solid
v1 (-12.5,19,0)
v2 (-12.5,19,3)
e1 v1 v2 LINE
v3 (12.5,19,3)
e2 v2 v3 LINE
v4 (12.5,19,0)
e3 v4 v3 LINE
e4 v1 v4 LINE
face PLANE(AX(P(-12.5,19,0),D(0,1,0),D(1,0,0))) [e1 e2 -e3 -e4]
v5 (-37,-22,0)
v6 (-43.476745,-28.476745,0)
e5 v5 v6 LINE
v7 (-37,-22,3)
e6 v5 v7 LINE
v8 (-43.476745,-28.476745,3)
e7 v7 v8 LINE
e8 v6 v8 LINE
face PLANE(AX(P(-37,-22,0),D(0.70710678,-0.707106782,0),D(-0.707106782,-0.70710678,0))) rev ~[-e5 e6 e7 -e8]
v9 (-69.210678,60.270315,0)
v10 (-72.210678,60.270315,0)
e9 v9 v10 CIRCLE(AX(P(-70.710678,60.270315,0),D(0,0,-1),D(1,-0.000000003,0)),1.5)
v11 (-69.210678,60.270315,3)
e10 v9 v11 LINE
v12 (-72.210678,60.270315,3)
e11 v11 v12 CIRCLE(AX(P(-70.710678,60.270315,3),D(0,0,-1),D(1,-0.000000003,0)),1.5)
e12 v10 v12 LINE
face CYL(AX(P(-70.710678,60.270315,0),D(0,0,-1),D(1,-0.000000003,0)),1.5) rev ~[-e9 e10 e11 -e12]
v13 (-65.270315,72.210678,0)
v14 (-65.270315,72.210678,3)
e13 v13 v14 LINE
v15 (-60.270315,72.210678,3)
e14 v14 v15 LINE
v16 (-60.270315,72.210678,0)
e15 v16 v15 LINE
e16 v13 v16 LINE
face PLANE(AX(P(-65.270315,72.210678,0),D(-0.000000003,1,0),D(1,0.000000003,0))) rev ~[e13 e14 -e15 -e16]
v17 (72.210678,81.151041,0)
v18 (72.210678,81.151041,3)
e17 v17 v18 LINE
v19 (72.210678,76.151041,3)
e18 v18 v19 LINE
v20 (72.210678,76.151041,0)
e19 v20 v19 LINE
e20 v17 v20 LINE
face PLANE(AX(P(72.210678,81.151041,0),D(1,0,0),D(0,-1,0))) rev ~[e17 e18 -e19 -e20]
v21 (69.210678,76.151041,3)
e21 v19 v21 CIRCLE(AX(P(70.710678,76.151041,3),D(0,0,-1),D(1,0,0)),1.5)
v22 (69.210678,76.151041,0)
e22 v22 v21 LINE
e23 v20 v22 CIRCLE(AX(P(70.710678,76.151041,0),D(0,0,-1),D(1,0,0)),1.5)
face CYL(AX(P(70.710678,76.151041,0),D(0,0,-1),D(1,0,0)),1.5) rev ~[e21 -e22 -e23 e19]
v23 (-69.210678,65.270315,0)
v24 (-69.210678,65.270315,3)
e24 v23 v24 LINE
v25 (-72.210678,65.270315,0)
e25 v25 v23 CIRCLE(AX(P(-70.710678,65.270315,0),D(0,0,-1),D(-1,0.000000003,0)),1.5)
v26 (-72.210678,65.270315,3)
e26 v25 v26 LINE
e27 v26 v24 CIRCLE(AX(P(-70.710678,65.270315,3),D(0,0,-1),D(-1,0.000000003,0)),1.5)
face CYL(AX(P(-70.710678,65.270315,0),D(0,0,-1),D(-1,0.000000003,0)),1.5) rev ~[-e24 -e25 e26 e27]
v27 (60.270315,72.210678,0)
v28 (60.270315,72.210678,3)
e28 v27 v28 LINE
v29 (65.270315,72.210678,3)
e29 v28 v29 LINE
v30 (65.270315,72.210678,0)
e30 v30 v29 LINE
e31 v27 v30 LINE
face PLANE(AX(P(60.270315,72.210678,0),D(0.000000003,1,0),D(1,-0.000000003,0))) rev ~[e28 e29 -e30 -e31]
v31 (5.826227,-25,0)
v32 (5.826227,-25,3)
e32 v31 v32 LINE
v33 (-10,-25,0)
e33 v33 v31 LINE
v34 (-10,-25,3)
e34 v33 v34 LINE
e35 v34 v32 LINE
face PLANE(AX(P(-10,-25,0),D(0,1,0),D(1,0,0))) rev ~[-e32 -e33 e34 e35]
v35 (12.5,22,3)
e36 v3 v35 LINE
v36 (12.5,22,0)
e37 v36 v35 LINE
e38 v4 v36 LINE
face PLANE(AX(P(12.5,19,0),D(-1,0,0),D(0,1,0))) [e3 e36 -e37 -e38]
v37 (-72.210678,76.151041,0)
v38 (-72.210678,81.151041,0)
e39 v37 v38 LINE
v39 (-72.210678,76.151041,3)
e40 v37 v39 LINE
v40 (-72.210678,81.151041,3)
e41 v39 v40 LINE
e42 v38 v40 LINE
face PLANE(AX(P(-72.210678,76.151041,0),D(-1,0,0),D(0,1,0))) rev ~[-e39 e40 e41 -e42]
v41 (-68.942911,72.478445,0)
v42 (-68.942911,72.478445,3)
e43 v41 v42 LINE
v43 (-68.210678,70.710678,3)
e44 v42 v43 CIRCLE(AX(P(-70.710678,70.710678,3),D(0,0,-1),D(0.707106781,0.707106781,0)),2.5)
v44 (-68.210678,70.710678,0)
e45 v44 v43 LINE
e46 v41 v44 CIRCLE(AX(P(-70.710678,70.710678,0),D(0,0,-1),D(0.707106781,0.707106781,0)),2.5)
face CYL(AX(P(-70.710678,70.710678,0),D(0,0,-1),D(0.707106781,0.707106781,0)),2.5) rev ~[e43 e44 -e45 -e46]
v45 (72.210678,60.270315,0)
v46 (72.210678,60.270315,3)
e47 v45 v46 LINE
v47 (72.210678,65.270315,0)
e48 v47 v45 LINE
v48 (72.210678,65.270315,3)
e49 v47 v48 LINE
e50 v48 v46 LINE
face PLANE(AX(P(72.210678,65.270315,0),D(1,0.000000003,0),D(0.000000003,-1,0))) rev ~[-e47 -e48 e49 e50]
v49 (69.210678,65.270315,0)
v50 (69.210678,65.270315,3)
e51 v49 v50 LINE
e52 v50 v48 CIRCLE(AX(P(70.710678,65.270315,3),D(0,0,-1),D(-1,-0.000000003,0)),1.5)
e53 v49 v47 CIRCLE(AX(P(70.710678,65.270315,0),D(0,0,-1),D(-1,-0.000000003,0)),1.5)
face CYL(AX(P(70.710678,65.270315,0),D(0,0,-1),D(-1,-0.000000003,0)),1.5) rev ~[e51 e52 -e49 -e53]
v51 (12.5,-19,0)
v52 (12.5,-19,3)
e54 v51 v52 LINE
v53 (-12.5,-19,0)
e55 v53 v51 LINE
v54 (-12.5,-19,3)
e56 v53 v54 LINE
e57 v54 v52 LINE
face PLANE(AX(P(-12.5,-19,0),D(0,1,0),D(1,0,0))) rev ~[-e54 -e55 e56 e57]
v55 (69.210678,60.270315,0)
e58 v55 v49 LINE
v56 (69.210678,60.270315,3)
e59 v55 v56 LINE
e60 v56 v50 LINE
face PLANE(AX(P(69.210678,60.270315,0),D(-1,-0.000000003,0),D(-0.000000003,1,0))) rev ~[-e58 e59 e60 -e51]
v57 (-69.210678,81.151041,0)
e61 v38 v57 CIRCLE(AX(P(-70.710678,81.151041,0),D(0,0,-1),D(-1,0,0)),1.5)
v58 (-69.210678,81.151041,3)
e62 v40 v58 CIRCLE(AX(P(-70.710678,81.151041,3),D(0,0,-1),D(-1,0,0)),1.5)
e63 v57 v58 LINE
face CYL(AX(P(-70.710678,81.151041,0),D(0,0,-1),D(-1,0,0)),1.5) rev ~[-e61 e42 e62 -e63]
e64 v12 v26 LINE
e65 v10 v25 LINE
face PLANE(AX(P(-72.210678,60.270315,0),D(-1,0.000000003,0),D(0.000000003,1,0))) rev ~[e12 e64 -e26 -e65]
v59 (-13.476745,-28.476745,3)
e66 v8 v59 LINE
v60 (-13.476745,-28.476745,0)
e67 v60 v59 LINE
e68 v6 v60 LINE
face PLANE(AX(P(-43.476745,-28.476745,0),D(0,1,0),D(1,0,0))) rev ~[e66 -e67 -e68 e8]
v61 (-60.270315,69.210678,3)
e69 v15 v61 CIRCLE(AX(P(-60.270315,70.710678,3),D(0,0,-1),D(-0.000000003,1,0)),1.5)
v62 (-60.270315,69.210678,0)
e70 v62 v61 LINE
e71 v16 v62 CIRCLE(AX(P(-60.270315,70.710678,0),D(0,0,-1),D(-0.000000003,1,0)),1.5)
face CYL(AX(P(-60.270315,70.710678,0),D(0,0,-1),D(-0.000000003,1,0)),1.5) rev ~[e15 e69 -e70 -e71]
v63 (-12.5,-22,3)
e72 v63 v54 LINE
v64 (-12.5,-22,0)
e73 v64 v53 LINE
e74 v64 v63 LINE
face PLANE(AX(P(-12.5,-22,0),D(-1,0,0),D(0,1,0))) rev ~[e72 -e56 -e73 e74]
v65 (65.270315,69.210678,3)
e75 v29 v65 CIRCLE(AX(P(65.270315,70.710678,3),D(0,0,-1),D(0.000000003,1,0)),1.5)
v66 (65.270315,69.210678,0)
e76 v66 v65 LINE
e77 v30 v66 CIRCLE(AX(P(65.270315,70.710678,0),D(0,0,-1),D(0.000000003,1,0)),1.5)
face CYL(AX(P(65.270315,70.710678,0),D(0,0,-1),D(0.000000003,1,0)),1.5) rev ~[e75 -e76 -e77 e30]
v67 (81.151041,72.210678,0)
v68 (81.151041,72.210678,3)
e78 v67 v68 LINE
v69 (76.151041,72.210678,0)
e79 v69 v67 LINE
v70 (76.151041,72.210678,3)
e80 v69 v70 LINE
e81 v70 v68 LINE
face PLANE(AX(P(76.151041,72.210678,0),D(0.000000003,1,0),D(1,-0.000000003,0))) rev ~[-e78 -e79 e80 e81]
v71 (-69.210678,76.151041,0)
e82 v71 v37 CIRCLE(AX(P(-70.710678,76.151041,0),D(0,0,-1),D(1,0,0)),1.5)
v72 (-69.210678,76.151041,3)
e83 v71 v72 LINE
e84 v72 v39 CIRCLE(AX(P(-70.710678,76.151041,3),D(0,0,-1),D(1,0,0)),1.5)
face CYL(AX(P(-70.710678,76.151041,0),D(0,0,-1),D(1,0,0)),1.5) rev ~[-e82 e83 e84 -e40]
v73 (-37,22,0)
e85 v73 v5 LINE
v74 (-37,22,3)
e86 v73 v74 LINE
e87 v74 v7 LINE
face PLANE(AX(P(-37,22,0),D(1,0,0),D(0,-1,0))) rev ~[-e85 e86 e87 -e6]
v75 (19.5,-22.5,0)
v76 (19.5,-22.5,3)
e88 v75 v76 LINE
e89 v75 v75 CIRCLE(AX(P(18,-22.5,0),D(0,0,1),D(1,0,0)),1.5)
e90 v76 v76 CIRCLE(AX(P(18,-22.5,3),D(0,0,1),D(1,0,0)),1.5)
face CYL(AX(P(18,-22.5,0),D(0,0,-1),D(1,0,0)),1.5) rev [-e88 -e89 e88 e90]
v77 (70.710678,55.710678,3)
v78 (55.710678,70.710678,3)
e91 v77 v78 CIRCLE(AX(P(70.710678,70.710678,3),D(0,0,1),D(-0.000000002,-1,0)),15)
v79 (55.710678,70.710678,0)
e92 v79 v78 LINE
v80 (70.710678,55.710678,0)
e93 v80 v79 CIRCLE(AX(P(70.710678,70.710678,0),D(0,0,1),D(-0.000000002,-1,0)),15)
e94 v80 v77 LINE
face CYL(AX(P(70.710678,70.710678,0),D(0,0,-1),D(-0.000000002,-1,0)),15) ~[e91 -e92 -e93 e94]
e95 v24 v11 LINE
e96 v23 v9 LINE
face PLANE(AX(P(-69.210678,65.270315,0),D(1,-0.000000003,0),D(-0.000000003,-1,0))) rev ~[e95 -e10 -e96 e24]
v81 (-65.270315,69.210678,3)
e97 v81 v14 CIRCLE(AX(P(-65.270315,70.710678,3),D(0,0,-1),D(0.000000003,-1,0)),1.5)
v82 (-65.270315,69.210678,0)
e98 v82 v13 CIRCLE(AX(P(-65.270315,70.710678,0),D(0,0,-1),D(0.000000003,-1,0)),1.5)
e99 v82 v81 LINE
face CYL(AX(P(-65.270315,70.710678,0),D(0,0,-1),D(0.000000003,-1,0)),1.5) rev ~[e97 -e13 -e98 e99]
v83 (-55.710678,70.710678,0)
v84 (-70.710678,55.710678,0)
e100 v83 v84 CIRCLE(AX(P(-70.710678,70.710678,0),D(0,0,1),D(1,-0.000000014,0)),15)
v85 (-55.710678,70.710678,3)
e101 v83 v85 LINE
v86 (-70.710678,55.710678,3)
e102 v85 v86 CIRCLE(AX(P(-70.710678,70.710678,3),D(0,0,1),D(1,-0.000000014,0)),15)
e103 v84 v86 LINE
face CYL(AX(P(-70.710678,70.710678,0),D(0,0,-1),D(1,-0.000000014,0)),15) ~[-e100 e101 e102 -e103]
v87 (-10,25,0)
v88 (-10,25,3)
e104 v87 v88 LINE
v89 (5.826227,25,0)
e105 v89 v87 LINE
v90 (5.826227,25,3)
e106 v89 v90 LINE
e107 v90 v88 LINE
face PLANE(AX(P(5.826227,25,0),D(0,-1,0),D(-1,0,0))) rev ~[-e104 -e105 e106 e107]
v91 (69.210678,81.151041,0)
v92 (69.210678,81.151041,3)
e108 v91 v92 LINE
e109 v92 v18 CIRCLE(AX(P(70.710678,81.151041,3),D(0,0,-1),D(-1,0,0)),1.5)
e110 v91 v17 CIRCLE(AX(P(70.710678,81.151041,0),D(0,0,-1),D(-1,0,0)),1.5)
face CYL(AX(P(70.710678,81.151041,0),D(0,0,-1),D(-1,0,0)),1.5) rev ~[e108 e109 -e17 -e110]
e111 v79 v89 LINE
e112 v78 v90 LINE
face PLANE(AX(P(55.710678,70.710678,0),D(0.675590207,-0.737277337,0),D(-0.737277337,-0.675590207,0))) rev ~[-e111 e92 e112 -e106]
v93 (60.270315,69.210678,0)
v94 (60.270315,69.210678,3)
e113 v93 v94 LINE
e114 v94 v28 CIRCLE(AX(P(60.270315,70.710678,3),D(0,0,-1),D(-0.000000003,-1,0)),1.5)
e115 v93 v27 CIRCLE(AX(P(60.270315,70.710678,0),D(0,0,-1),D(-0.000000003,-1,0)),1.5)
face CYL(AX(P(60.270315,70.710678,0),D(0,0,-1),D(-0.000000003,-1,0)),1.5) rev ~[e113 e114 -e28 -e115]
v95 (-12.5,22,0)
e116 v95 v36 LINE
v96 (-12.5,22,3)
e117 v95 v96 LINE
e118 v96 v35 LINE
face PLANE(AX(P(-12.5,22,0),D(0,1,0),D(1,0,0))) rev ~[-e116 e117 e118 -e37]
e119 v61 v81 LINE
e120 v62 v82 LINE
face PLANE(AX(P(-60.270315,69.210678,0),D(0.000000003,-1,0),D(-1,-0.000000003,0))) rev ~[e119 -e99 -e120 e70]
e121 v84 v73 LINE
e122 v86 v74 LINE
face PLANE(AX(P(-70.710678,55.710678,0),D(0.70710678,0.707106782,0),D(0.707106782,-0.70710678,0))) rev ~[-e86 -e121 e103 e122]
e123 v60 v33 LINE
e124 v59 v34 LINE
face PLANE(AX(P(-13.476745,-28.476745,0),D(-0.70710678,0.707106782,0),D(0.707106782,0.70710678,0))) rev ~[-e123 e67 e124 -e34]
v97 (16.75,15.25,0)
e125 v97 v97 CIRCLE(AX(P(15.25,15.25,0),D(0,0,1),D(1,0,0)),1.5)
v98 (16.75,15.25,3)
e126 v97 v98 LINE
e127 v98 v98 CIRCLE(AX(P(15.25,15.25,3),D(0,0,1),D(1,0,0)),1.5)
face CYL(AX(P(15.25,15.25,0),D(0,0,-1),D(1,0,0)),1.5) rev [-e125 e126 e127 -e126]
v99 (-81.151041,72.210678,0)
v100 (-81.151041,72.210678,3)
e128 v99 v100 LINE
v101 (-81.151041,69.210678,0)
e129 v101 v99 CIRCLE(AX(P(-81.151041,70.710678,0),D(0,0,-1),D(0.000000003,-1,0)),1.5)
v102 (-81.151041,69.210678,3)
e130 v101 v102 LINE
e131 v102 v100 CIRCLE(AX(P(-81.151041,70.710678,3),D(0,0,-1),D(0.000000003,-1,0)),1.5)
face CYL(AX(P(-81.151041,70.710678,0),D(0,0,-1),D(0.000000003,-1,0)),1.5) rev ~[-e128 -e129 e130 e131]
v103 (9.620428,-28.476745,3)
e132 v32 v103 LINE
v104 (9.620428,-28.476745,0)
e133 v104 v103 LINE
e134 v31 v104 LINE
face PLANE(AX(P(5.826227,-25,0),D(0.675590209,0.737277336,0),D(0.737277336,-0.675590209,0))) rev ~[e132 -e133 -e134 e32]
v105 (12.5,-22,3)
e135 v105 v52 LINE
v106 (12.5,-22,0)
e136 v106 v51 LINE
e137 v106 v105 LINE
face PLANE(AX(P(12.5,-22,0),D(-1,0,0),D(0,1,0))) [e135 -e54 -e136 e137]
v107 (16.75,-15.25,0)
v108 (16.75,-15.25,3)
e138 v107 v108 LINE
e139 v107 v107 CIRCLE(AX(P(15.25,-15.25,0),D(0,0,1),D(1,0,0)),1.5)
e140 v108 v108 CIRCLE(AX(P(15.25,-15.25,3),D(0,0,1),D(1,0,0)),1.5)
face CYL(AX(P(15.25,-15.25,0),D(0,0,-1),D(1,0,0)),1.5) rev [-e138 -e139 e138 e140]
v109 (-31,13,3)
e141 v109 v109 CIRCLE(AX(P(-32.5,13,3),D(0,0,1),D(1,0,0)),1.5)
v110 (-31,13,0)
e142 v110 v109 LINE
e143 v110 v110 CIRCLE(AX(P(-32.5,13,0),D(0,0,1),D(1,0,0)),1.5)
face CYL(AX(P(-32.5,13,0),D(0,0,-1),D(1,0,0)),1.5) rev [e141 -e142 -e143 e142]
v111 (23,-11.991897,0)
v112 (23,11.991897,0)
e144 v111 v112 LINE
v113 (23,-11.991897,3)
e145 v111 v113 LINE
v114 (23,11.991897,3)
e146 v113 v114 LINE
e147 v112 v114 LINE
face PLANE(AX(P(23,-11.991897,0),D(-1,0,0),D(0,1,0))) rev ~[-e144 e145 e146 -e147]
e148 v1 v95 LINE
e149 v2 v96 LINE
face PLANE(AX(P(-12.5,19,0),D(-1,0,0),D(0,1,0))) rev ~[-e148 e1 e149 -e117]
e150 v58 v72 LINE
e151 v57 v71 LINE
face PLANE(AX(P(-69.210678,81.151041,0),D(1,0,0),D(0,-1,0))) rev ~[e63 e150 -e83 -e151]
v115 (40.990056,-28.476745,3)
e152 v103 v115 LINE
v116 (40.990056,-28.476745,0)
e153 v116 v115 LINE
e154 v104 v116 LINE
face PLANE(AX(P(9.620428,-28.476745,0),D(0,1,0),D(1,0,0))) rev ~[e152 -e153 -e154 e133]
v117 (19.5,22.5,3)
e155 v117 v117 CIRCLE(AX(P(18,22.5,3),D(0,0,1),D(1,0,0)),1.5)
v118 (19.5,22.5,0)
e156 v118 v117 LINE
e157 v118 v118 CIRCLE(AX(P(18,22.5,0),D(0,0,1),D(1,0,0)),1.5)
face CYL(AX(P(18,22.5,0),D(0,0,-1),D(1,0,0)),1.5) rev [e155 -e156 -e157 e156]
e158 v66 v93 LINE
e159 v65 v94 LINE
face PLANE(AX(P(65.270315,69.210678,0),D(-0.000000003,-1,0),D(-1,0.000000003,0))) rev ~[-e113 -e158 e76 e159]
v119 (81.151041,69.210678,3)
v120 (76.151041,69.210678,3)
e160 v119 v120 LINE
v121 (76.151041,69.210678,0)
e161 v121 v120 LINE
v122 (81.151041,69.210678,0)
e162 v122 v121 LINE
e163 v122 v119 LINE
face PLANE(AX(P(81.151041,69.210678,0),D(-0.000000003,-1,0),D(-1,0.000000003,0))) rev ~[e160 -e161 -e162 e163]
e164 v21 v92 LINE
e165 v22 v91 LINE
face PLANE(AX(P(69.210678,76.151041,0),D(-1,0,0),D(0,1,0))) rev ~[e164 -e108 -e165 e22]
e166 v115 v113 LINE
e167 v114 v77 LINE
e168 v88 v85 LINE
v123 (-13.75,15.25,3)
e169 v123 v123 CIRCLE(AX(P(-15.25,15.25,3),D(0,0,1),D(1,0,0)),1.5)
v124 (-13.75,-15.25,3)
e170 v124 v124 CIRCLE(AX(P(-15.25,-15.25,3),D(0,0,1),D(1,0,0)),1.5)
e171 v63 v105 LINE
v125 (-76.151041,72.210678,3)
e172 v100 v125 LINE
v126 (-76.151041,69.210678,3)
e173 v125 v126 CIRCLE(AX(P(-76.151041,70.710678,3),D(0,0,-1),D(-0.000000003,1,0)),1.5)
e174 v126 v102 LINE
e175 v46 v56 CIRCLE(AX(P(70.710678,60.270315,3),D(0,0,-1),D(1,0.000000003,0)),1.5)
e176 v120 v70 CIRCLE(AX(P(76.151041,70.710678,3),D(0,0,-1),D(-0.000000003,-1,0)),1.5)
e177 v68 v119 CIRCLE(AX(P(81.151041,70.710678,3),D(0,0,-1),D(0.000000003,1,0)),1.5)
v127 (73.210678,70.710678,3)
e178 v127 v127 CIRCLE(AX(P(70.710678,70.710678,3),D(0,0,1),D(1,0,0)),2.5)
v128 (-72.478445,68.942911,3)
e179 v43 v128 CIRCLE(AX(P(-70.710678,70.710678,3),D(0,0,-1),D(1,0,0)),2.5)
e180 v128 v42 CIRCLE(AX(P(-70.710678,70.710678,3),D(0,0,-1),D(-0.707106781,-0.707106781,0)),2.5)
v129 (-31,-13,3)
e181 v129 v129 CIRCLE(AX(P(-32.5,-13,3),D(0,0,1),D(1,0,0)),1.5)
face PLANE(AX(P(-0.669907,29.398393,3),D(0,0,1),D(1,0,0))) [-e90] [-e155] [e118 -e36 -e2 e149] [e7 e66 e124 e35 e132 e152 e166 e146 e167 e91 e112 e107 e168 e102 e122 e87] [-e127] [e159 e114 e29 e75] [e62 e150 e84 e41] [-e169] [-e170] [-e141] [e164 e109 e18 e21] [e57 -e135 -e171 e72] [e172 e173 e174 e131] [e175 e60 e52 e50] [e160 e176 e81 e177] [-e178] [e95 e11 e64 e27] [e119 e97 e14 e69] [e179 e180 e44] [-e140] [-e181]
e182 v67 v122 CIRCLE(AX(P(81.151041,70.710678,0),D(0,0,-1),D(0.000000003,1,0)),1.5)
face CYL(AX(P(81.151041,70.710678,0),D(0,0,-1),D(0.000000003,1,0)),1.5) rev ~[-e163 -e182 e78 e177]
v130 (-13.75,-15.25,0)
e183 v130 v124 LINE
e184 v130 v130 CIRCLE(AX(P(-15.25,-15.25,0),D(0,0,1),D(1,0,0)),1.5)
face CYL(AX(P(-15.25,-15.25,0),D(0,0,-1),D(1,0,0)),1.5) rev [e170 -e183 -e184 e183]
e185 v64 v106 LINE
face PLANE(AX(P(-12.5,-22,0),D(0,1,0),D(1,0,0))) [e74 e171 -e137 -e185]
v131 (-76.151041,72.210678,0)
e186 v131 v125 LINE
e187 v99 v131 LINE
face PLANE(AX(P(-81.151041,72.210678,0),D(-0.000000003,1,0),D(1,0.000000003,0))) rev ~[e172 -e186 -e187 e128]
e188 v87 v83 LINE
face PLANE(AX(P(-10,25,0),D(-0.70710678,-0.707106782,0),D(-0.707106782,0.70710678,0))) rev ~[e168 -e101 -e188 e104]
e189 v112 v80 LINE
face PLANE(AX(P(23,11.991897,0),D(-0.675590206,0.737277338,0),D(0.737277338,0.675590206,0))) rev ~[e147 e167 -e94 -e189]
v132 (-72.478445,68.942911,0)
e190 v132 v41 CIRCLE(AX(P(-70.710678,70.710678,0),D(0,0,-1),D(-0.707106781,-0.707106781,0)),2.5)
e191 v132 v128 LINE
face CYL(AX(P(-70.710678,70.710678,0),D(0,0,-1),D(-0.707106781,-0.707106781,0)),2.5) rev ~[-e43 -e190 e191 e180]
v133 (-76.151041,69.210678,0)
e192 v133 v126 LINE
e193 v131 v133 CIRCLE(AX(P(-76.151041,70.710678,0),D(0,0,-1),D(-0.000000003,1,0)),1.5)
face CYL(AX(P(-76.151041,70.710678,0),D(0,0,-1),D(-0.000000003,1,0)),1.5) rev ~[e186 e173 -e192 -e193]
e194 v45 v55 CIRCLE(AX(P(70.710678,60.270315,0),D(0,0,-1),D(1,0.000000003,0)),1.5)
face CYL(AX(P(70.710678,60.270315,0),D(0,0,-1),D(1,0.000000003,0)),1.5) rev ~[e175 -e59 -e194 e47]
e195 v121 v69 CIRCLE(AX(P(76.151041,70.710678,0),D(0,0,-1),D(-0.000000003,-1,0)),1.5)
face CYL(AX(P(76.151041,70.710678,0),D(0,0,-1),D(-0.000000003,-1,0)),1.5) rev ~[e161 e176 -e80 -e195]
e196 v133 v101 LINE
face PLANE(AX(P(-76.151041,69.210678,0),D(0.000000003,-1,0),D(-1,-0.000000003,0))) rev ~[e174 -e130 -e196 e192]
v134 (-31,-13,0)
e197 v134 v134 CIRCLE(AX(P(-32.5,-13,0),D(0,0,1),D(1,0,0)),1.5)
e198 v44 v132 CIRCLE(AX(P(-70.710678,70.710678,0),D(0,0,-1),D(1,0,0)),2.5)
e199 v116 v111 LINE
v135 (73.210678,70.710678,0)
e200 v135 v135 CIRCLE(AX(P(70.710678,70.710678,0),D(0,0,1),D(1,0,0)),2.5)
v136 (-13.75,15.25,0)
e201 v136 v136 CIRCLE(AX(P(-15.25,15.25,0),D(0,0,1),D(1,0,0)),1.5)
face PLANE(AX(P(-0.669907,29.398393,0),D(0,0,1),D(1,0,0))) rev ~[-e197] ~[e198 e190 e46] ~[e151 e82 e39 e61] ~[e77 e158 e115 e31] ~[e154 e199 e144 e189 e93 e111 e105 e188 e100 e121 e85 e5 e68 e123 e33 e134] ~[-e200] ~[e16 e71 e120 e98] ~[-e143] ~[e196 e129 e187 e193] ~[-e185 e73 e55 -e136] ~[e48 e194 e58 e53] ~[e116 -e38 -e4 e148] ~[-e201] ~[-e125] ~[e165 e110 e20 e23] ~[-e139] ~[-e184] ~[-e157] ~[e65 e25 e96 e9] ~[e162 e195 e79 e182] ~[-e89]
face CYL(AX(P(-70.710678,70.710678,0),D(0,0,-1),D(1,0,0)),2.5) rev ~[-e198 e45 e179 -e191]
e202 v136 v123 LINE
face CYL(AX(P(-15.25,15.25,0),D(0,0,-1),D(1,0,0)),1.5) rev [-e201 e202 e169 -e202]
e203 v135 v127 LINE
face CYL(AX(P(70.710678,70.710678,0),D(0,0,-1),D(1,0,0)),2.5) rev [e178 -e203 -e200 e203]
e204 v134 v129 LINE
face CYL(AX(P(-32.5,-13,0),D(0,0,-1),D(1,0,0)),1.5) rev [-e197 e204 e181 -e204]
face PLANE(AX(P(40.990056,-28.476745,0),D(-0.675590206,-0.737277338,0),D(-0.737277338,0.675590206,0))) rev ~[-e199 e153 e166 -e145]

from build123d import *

# Parameters (mm, degrees)
F0_R     = 1.5
F0_W     = 25
F0_H     = 3
F0_R_2   = 2.5
F1_DEPTH = 3


# Not quite as in the source:
# - ends of sketch curves that miss each other by under 0.0002 mm in the source are joined


with BuildPart() as f1:
    # F0 (on Top) → F1 (new body)
    with BuildSketch(Plane.XY):
        with BuildLine():
            Line((-10.0000000587, 25), (-55.7106781187, 70.7106779065))
            ThreePointArc((-55.7106781187, 70.7106779065), (-81.3172799026, 81.3172797703), (-70.7106779065, 55.7106781187))
            Line((-70.7106779065, 55.7106781187), (-37, 22.0000003253))
            Line((-37, 22.0000003253), (-37, -22.0000003253))
            Line((-37, -22.0000003253), (-43.4767450368, -28.4767453404))
            Line((-43.4767450368, -28.4767453404), (-13.4767454108, -28.4767453404))
            Line((-13.4767454108, -28.4767453404), (-10.0000000587, -25))
            Line((-10.0000000587, -25), (5.8262266936, -25))
            Line((5.8262266936, -25), (9.6204284269, -28.4767453404))
            Line((9.6204284269, -28.4767453404), (40.9900556349, -28.4767453404))
            Line((40.9900556349, -28.4767453404), (23, -11.9918965954))
            Line((23, -11.9918965954), (23, 11.9918965954))
            Line((23, 11.9918965954), (70.7106780935, 55.7106781187))
            ThreePointArc((70.7106780935, 55.7106781187), (81.3172798365, 81.3172798365), (55.7106781187, 70.7106779065))
            Line((55.7106781187, 70.7106779065), (5.8262266936, 25))
            Line((5.8262266936, 25), (-10.0000000587, 25))
        make_face()
        with Locations((-15.25, -15.25)):
            Circle(F0_R, mode=Mode.SUBTRACT)
        with Locations((-32.5, -13)):
            Circle(F0_R, mode=Mode.SUBTRACT)
        with Locations((-32.5, 13)):
            Circle(F0_R, mode=Mode.SUBTRACT)
        with Locations((-15.25, 15.25)):
            Circle(F0_R, mode=Mode.SUBTRACT)
        with Locations((18, -22.5)):
            Circle(F0_R, mode=Mode.SUBTRACT)
        with Locations((0, -20.5)):
            Rectangle(F0_W, F0_H, mode=Mode.SUBTRACT)
        with Locations((15.25, -15.25)):
            Circle(F0_R, mode=Mode.SUBTRACT)
        with Locations((0, 20.5)):
            Rectangle(F0_W, F0_H, mode=Mode.SUBTRACT)
        with Locations((15.25, 15.25)):
            Circle(F0_R, mode=Mode.SUBTRACT)
        with Locations((18, 22.5)):
            Circle(F0_R, mode=Mode.SUBTRACT)
        with BuildLine():
            ThreePointArc((-72.2106780183, 65.2703154499), (-70.7106780132, 66.7703154448), (-69.2106780183, 65.2703154398))
            Line((-69.2106780183, 65.2703154398), (-69.210678035, 60.2703154398))
            ThreePointArc((-69.210678035, 60.2703154398), (-70.7106780401, 58.7703154448), (-72.210678035, 60.2703154499))
            Line((-72.210678035, 60.2703154499), (-72.2106780183, 65.2703154499))
        make_face(mode=Mode.SUBTRACT)
        with BuildLine():
            ThreePointArc((-76.1510407975, 72.2106782191), (-74.6510407925, 70.7106782241), (-76.1510407874, 69.2106782191))
            Line((-76.1510407874, 69.2106782191), (-81.1510407874, 69.2106782023))
            ThreePointArc((-81.1510407874, 69.2106782023), (-82.6510407925, 70.7106781972), (-81.1510407975, 72.2106782023))
            Line((-81.1510407975, 72.2106782023), (-76.1510407975, 72.2106782191))
        make_face(mode=Mode.SUBTRACT)
        with BuildLine():
            ThreePointArc((-68.9429111657, 72.4784450716), (-68.4009792874, 71.6673866996), (-68.2106781187, 70.7106781187))
            ThreePointArc((-68.2106781187, 70.7106781187), (-69.7539695377, 68.4009792874), (-72.4784450716, 68.9429111657))
            ThreePointArc((-72.4784450716, 68.9429111657), (-72.4784450716, 72.4784450716), (-68.9429111657, 72.4784450716))
        make_face(mode=Mode.SUBTRACT)
        with BuildLine():
            Line((-60.2703154398, 69.210678035), (-65.2703154398, 69.2106780183))
            ThreePointArc((-65.2703154398, 69.2106780183), (-66.7703154448, 70.7106780132), (-65.2703154499, 72.2106780183))
            Line((-65.2703154499, 72.2106780183), (-60.2703154499, 72.210678035))
            ThreePointArc((-60.2703154499, 72.210678035), (-58.7703154448, 70.7106780401), (-60.2703154398, 69.210678035))
        make_face(mode=Mode.SUBTRACT)
        with BuildLine():
            Line((-69.210678, 81.1510407925), (-69.210678, 76.1510407925))
            ThreePointArc((-69.210678, 76.1510407925), (-70.710678, 74.6510407925), (-72.210678, 76.1510407925))
            Line((-72.210678, 76.1510407925), (-72.210678, 81.1510407925))
            ThreePointArc((-72.210678, 81.1510407925), (-70.710678, 82.6510407925), (-69.210678, 81.1510407925))
        make_face(mode=Mode.SUBTRACT)
        with BuildLine():
            ThreePointArc((65.2703154499, 72.2106780183), (66.7703154448, 70.7106780132), (65.2703154398, 69.2106780183))
            Line((65.2703154398, 69.2106780183), (60.2703154398, 69.210678035))
            ThreePointArc((60.2703154398, 69.210678035), (58.7703154448, 70.7106780401), (60.2703154499, 72.210678035))
            Line((60.2703154499, 72.210678035), (65.2703154499, 72.2106780183))
        make_face(mode=Mode.SUBTRACT)
        with BuildLine():
            Line((69.210678035, 60.2703154398), (69.2106780183, 65.2703154398))
            ThreePointArc((69.2106780183, 65.2703154398), (70.7106780132, 66.7703154448), (72.2106780183, 65.2703154499))
            Line((72.2106780183, 65.2703154499), (72.210678035, 60.2703154499))
            ThreePointArc((72.210678035, 60.2703154499), (70.7106780401, 58.7703154448), (69.210678035, 60.2703154398))
        make_face(mode=Mode.SUBTRACT)
        with Locations((70.7106781187, 70.7106781187)):
            Circle(F0_R_2, mode=Mode.SUBTRACT)
        with BuildLine():
            Line((81.1510407874, 69.2106782023), (76.1510407874, 69.2106782191))
            ThreePointArc((76.1510407874, 69.2106782191), (74.6510407925, 70.7106782241), (76.1510407975, 72.2106782191))
            Line((76.1510407975, 72.2106782191), (81.1510407975, 72.2106782023))
            ThreePointArc((81.1510407975, 72.2106782023), (82.6510407925, 70.7106781972), (81.1510407874, 69.2106782023))
        make_face(mode=Mode.SUBTRACT)
        with BuildLine():
            Line((72.210678, 81.1510407925), (72.210678, 76.1510407925))
            ThreePointArc((72.210678, 76.1510407925), (70.710678, 74.6510407925), (69.210678, 76.1510407925))
            Line((69.210678, 76.1510407925), (69.210678, 81.1510407925))
            ThreePointArc((69.210678, 81.1510407925), (70.710678, 82.6510407925), (72.210678, 81.1510407925))
        make_face(mode=Mode.SUBTRACT)
    extrude(amount=F1_DEPTH)


solid = f1.part
